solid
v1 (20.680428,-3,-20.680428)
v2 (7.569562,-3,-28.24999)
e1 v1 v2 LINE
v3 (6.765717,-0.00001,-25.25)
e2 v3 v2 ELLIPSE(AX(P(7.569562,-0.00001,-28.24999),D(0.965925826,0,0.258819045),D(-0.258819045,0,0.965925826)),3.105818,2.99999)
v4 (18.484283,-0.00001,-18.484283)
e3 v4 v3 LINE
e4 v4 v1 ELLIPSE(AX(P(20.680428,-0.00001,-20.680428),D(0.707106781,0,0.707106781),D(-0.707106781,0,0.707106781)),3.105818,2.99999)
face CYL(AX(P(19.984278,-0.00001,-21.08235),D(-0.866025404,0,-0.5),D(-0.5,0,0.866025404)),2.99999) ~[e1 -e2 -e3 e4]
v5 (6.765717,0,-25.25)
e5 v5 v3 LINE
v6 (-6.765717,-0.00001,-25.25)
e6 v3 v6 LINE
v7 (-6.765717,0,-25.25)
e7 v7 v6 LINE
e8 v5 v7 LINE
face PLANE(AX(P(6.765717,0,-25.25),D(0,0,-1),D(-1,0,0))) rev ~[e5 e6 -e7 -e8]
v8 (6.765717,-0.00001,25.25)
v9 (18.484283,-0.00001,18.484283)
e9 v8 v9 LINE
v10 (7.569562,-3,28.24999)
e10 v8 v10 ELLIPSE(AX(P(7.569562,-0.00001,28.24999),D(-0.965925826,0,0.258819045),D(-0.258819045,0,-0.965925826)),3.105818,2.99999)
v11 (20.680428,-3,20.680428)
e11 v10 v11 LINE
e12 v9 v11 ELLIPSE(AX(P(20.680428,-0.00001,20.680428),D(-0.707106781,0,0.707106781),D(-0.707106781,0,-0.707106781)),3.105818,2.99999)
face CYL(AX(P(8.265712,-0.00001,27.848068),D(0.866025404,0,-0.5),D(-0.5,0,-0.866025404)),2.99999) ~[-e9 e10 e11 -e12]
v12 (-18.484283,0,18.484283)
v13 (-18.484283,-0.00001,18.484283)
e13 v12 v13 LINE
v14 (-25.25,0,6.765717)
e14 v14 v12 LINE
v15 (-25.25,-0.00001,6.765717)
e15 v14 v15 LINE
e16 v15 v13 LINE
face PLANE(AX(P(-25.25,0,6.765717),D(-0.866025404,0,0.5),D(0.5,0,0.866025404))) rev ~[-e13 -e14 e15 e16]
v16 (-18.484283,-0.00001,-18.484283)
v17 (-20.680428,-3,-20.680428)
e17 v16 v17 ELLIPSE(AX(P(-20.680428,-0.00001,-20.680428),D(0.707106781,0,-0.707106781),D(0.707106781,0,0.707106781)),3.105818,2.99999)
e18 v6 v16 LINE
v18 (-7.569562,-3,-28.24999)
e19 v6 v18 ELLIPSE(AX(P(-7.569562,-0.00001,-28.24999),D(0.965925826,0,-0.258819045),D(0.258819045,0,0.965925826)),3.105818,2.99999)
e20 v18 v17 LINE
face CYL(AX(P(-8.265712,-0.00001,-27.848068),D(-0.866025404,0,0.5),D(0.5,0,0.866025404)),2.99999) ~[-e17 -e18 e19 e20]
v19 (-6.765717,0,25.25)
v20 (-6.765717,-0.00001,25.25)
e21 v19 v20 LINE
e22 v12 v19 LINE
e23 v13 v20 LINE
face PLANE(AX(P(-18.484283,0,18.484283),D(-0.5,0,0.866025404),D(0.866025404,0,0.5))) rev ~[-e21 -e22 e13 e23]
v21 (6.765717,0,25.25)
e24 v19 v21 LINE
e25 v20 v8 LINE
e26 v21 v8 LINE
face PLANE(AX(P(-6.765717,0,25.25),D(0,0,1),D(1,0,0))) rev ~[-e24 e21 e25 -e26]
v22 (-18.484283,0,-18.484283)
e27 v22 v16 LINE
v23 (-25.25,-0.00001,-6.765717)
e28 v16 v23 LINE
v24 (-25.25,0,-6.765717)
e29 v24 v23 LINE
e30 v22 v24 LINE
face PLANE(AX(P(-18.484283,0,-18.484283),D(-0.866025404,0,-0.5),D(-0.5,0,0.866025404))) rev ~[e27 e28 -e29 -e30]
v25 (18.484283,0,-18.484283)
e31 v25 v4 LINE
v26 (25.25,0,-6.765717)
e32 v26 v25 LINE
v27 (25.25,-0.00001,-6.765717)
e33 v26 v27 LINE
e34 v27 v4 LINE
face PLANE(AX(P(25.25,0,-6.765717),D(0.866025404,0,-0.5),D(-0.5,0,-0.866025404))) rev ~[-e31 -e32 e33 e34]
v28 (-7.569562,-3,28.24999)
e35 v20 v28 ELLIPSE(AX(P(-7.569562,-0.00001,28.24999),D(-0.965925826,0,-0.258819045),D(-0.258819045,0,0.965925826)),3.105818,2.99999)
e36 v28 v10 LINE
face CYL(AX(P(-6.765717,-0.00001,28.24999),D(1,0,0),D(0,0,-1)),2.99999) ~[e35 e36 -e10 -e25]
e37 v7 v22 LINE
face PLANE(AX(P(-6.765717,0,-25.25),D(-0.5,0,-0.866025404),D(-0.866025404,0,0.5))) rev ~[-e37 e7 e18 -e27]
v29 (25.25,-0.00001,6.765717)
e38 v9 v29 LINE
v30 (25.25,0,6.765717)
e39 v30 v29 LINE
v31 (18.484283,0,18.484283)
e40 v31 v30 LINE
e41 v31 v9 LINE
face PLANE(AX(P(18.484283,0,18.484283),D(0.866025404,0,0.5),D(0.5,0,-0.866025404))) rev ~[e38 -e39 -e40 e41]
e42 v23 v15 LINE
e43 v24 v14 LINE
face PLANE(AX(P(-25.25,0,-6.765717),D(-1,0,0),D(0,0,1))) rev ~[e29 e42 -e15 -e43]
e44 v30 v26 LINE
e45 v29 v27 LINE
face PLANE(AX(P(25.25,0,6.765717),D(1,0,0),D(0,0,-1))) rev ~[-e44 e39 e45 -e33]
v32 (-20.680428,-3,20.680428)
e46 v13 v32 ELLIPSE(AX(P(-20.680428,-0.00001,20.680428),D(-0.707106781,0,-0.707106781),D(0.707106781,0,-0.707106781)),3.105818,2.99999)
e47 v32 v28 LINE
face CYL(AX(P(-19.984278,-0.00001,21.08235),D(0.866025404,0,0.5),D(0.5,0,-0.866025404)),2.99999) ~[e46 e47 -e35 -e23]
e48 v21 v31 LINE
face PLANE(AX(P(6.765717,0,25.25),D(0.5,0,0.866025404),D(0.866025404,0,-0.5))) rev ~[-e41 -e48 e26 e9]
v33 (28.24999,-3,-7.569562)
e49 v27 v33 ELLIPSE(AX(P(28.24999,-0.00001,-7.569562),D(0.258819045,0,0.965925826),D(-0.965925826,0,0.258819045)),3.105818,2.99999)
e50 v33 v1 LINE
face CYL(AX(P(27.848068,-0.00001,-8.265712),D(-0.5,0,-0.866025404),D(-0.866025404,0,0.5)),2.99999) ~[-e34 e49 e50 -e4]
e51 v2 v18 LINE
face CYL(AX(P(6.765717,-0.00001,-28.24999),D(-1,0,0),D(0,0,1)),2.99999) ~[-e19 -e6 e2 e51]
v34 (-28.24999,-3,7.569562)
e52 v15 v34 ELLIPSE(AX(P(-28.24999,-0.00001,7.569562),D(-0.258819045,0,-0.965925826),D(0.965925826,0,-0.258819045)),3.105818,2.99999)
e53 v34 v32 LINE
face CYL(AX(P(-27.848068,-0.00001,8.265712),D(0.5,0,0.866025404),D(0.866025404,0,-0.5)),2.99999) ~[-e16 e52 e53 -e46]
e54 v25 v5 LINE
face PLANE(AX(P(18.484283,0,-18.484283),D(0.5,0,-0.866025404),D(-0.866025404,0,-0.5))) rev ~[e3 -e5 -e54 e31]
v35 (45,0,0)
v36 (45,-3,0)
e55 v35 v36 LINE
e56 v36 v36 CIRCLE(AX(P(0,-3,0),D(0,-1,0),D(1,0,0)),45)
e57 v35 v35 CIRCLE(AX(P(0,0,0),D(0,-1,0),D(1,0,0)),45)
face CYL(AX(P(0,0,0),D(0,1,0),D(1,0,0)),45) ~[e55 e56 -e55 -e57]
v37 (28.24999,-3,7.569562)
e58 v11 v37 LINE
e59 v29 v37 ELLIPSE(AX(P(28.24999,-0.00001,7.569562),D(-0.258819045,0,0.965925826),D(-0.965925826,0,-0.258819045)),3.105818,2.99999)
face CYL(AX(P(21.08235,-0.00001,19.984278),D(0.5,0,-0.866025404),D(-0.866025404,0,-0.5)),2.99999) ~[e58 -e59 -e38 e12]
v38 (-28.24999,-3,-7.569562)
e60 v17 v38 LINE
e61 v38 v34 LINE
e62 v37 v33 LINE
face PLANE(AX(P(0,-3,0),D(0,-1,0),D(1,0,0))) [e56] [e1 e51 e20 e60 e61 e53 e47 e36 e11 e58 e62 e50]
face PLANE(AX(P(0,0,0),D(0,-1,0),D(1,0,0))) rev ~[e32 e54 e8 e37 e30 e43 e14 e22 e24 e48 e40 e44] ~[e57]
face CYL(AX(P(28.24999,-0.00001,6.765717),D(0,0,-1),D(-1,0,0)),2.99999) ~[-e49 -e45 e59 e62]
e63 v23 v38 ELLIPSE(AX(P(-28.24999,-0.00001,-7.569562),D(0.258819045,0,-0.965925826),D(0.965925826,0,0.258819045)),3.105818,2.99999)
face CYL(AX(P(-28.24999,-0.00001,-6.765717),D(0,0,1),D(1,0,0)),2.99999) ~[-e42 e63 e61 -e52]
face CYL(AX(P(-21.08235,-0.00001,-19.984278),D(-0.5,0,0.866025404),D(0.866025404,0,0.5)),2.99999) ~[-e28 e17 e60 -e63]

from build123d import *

# Parameters (mm, degrees)
F0_R     = 45
F1_DEPTH = 3
F2_R     = 2.99999


# Not quite as in the source:
# - a fillet or chamfer is up to 0.001 mm smaller than in the source, because OpenCascade refuses the exact size


with BuildPart() as f1:
    # F0 (on Front) → F1 (new body)
    with BuildSketch(Plane.XZ):
        Circle(F0_R)
        Polygon((-18.4842828911, 18.4842828911), (-6.7657171089, 25.25), (6.7657171089, 25.25), (18.4842828911, 18.4842828911), (25.25, 6.7657171089), (25.25, -6.7657171089), (18.4842828911, -18.4842828911), (6.7657171089, -25.25), (-6.7657171089, -25.25), (-18.4842828911, -18.4842828911), (-25.25, -6.7657171089), (-25.25, 6.7657171089), align=None, mode=Mode.SUBTRACT)
    extrude(amount=F1_DEPTH)

    # F2 (radius 3 in the source; OpenCascade refuses exactly that, so slightly less here)
    f2_edges = [f1.edges().sort_by_distance(p)[0] for p in [
        (-12.625, -3, 21.867141),
        (-21.867141, -3, 12.625),
        (-25.25, -3, 0),
        (-21.867141, -3, -12.625),
        (-12.625, -3, -21.867141),
        (0, -3, -25.25),
        (12.625, -3, -21.867141),
        (21.867141, -3, -12.625),
        (25.25, -3, 0),
        (21.867141, -3, 12.625),
        (12.625, -3, 21.867141),
        (0, -3, 25.25),
    ]]
    fillet(f2_edges, radius=F2_R)


solid = f1.part
